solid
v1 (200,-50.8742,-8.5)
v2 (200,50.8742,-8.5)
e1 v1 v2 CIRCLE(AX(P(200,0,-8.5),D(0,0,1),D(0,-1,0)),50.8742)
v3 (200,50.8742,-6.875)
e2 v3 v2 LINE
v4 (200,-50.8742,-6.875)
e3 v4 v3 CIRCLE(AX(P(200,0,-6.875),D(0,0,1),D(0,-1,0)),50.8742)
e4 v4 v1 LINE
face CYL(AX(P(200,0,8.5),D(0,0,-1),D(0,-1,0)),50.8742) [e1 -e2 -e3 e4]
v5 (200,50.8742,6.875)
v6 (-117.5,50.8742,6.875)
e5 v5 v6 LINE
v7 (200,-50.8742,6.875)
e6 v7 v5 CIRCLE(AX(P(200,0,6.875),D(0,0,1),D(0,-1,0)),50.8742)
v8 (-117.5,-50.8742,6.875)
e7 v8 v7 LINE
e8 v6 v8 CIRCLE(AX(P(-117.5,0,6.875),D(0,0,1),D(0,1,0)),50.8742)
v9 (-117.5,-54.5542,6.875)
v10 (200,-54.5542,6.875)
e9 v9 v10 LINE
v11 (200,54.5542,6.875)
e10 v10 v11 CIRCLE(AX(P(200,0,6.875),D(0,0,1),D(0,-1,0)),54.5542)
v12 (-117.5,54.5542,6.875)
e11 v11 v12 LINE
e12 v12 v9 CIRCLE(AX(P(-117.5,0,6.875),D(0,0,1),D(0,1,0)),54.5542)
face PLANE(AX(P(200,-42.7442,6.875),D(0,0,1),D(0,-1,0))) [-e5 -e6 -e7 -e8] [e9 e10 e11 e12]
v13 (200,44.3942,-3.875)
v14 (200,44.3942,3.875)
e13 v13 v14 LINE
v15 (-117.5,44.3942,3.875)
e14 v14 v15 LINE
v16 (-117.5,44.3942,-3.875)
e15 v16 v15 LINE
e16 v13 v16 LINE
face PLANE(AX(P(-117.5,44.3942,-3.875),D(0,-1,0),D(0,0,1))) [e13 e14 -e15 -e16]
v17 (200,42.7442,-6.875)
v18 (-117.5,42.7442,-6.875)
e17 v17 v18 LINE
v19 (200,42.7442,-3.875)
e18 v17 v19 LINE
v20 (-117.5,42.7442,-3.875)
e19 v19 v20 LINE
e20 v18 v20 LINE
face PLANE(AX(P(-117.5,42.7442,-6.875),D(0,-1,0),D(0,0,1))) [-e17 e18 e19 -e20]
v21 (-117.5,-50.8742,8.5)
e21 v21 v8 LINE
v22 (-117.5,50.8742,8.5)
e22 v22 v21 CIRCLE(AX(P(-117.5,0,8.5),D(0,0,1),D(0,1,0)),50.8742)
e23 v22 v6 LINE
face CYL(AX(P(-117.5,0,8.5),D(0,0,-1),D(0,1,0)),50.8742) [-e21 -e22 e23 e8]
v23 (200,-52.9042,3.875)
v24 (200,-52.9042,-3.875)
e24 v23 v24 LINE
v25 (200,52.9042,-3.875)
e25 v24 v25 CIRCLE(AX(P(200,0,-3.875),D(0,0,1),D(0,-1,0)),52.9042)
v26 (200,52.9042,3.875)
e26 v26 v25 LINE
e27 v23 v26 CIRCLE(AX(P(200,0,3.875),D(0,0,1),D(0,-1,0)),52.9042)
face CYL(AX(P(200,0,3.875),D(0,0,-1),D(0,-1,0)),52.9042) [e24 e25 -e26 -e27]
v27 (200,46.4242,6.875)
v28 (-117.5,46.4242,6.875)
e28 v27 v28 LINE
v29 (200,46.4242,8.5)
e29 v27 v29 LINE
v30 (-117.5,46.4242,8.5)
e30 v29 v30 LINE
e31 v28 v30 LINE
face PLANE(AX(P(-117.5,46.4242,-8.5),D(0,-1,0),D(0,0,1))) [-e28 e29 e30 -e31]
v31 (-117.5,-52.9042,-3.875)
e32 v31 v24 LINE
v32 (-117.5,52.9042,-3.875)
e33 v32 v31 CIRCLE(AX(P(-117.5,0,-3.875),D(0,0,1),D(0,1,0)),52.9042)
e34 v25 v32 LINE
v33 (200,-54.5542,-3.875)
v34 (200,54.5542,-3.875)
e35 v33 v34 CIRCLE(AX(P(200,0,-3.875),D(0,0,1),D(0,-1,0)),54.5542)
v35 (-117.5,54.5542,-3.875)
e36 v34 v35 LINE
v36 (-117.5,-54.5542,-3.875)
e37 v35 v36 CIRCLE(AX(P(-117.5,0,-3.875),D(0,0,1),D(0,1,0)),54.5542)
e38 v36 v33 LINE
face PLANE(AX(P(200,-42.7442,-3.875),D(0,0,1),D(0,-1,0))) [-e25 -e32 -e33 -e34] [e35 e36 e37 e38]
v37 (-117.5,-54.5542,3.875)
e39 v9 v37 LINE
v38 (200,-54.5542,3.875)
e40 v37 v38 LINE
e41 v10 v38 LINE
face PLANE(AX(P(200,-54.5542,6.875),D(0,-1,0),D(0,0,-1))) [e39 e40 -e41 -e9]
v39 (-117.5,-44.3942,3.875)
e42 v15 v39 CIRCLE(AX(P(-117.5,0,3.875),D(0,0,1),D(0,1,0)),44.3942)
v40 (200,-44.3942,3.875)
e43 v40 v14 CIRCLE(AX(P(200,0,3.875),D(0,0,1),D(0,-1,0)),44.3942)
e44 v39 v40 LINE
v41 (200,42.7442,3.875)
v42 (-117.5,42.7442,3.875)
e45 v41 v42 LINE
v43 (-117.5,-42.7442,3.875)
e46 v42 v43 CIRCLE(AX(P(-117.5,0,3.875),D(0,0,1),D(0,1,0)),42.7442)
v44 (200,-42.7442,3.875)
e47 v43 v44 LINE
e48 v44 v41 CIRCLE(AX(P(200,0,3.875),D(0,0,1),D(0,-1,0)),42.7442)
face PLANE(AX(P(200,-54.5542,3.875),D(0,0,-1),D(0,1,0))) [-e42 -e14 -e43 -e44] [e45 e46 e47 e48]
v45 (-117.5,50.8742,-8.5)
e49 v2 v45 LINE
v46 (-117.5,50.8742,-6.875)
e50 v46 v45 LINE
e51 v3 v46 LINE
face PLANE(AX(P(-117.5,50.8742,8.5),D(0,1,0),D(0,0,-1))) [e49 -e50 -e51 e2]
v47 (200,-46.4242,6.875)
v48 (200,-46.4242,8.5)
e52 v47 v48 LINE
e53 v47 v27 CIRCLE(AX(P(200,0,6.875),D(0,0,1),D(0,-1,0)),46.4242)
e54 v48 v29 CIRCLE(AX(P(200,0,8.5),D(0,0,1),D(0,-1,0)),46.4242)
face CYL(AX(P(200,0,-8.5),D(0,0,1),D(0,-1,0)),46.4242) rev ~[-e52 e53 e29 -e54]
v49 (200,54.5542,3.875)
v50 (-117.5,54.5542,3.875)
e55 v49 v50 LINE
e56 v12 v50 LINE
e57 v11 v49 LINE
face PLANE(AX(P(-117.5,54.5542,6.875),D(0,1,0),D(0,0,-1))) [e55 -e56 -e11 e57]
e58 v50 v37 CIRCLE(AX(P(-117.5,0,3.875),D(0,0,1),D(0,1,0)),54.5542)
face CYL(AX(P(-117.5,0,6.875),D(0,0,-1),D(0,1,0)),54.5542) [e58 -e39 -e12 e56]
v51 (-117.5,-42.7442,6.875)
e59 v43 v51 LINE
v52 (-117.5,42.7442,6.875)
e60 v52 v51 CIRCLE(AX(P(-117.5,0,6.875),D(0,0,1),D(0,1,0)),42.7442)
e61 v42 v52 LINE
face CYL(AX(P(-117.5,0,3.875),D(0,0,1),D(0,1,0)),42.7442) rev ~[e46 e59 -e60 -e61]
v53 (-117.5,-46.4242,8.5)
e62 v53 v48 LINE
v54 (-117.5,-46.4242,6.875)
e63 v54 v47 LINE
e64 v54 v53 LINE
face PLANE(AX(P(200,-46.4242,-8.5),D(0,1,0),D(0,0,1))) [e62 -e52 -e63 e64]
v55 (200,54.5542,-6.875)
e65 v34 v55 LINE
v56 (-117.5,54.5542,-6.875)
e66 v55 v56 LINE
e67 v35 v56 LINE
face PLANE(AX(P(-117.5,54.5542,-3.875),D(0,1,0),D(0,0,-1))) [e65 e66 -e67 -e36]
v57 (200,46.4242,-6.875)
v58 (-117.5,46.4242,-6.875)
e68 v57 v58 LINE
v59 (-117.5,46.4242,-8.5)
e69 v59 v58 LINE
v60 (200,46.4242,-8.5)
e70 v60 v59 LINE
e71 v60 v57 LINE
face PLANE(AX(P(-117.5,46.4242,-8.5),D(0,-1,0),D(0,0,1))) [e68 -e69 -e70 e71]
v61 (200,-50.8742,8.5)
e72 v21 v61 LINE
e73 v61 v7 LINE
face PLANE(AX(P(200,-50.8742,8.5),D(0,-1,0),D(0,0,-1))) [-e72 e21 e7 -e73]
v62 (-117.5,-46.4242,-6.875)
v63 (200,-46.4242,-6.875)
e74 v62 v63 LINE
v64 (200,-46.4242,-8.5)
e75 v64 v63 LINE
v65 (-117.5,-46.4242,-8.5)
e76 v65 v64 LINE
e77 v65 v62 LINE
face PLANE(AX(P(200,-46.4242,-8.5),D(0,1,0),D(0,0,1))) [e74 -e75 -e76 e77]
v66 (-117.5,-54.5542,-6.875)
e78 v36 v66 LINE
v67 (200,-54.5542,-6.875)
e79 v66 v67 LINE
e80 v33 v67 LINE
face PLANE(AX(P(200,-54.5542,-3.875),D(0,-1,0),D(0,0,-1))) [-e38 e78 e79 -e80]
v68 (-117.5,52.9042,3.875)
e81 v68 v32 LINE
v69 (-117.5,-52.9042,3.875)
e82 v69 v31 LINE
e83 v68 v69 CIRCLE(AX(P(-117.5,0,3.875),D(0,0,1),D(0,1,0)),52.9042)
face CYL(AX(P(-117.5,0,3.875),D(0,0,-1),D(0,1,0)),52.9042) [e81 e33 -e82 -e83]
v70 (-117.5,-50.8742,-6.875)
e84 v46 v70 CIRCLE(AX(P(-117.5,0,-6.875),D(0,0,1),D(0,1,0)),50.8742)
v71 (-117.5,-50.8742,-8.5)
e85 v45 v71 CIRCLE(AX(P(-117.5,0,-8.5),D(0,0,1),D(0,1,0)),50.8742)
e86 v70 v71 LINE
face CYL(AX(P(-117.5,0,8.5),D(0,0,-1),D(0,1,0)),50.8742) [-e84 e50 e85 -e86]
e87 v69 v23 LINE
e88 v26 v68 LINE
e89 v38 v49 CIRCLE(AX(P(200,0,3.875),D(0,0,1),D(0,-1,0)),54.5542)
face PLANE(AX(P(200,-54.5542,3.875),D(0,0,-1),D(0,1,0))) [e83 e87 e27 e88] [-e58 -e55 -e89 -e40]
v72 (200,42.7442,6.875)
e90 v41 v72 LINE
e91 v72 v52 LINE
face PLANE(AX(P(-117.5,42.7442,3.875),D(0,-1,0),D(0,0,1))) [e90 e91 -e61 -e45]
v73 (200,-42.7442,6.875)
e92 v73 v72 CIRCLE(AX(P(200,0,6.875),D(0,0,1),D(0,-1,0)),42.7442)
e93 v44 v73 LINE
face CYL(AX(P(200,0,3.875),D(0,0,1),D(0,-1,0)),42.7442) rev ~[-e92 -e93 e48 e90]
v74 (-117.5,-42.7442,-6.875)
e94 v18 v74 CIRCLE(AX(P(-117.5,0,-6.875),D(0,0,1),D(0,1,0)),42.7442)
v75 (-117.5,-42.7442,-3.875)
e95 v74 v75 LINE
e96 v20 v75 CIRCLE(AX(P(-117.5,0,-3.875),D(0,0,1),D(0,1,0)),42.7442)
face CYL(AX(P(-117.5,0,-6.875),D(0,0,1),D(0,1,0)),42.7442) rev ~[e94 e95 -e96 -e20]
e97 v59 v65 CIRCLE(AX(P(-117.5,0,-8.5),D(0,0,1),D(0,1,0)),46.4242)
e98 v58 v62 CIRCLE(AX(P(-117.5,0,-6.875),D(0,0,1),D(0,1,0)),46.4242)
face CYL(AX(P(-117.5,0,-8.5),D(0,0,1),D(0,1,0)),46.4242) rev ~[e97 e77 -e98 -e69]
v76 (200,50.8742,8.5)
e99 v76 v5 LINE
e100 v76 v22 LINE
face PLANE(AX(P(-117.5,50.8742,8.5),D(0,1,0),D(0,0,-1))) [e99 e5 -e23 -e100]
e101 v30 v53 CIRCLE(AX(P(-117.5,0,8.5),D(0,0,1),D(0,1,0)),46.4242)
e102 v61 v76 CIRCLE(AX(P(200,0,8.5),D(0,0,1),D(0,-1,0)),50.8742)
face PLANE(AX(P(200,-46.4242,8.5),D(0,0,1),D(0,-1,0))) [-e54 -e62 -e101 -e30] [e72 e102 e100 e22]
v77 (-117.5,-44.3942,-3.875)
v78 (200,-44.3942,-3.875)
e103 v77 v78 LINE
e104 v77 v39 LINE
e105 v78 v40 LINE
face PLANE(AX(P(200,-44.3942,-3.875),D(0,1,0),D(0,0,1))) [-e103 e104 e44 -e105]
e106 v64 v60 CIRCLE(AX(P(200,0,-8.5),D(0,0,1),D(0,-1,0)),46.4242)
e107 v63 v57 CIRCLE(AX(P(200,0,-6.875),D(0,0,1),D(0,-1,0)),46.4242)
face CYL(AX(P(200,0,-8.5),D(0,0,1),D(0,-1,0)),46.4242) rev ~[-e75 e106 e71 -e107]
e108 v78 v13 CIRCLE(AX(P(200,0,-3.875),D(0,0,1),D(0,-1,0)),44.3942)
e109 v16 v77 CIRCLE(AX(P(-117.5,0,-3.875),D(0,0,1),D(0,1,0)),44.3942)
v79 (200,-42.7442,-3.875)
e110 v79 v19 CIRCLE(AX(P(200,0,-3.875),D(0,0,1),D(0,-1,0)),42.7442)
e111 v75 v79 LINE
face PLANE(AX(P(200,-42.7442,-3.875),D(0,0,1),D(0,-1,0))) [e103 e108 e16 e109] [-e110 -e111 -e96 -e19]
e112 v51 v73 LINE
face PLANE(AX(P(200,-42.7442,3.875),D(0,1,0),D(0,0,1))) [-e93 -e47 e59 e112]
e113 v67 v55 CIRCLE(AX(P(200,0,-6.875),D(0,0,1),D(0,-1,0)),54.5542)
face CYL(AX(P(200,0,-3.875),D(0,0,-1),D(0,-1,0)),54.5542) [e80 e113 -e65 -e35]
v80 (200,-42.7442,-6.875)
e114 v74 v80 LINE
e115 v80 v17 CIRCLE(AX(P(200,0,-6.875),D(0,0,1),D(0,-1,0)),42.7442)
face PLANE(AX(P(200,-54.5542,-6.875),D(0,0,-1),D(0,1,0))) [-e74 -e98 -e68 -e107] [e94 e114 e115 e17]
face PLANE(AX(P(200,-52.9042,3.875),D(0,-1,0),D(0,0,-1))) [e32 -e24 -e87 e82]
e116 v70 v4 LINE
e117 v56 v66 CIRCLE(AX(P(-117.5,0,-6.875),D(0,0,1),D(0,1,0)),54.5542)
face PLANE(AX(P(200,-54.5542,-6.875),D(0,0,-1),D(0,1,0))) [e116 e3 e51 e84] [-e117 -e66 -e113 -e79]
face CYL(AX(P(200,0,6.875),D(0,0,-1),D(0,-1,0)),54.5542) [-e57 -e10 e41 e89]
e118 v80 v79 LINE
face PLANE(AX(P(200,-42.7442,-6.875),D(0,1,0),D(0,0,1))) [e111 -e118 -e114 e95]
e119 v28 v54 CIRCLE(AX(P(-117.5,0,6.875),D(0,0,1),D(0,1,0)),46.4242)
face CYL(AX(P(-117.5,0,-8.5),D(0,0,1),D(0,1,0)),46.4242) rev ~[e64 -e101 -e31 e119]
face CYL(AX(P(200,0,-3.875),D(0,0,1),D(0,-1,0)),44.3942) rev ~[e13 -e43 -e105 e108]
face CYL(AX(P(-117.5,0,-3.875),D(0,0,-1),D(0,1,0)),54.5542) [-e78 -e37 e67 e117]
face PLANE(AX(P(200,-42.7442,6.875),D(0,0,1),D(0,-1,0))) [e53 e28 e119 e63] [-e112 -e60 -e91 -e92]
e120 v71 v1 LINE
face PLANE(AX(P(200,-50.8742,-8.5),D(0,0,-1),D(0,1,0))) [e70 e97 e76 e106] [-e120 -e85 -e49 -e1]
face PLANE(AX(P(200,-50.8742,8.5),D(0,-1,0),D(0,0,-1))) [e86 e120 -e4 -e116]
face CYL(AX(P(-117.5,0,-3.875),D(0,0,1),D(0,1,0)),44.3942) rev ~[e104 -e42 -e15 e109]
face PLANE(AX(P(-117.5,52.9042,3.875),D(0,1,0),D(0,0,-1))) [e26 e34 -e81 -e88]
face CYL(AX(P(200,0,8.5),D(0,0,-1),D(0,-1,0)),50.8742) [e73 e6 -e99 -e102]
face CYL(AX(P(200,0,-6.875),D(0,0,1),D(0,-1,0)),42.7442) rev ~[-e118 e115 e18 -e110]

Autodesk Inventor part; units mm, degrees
ref_plane "Work Plane2" through (-117.5, 0, 0) normal (-1, 0, 0) x (0, 0, 1)
ref_plane "Work Plane3" through (200, 0, 0) normal (-0.9659258, 0.258819, 0) x (0, 0, 1)
sketch "Path" plane through (0, 0, 0) normal (0, 0, 1) x (1, 0, 0)
  arc A0 (-117.5, 48.6492) -> (-117.5, -48.6492) centre (-117.5, 0) ccw
  arc A1 (200, -48.6492) -> (200, 48.6492) centre (200, 0) ccw
  line L0 (200, -48.6492) -> (-117.5, -48.6492)
  line L1 (-117.5, 48.6492) -> (200, 48.6492)
  dimension "d31" = 11.81
ref_plane "Section Plane" through (-117.5, -48.6492, 0) normal (1, 0, 0) x (0, 0, 1)
sketch "Section Sketch" plane through (-117.5, -48.6492, 0) normal (1, 0, 0) x (0, 0, 1)
  line L0 (-8.5, -2.225) -> (8.5, -2.225)
  line L1 (8.5, -2.225) -> (8.5, 2.225)
  line L2 (8.5, 2.225) -> (-8.5, 2.225)
  line L3 (-8.5, 2.225) -> (-8.5, -2.225)
  line L4 (-3.875, -4.255) -> (3.875, -4.255)
  line L5 (3.875, -4.255) -> (3.875, 4.255)
  line L6 (3.875, 4.255) -> (-3.875, 4.255)
  line L7 (-3.875, 4.255) -> (-3.875, -4.255)
  line L8 (-3.875, 0) -> (3.875, 0) construction
  line L9 (-6.875, -5.905) -> (-3.875, -5.905)
  line L10 (-3.875, -5.905) -> (-3.875, 5.905)
  line L11 (-3.875, 5.905) -> (-6.875, 5.905)
  line L12 (-6.875, 5.905) -> (-6.875, -5.905)
  line L13 (3.875, -5.905) -> (6.875, -5.905)
  line L14 (6.875, -5.905) -> (6.875, 5.905)
  line L15 (6.875, 5.905) -> (3.875, 5.905)
  line L16 (3.875, 5.905) -> (3.875, -5.905)
  line L17 (-8.5, 0) -> (8.5, 0) construction
  point P0 (0, 0)
  point P1 (0, 0)
  dimension "d21" = 4.45
  dimension "d22" = 8.51
  dimension "d23" = 7.75
  dimension "d24" = 3
  dimension "d31" = 11.81
  dimension "d32" = 17
sweep "Solid" add profiles "Section Sketch" path "Path"
pattern_of_one "Strand Pattern"
equation "\"d21\" = da_d2"
equation "\"d22\" = da_d1"
equation "\"d23\" = da_b1"
equation "\"d24\" = da_t1 + da_t2"
equation "\"d30\" = da_pt"
equation "\"da_p\" = 12.7"
equation "\"da_b1\" = 7.75"
equation "\"da_h2\" = 11.81"
equation "\"da_h3\" = 10.92"
equation "\"da_d1\" = 8.51"
equation "\"da_d2\" = 4.45"
equation "\"da_pt\" = 13.92"
equation "\"da_b\" = 17"
equation "\"da_t1\" = 1.5"
equation "\"da_t2\" = 1.5"
properties part number "Roller Chain"
